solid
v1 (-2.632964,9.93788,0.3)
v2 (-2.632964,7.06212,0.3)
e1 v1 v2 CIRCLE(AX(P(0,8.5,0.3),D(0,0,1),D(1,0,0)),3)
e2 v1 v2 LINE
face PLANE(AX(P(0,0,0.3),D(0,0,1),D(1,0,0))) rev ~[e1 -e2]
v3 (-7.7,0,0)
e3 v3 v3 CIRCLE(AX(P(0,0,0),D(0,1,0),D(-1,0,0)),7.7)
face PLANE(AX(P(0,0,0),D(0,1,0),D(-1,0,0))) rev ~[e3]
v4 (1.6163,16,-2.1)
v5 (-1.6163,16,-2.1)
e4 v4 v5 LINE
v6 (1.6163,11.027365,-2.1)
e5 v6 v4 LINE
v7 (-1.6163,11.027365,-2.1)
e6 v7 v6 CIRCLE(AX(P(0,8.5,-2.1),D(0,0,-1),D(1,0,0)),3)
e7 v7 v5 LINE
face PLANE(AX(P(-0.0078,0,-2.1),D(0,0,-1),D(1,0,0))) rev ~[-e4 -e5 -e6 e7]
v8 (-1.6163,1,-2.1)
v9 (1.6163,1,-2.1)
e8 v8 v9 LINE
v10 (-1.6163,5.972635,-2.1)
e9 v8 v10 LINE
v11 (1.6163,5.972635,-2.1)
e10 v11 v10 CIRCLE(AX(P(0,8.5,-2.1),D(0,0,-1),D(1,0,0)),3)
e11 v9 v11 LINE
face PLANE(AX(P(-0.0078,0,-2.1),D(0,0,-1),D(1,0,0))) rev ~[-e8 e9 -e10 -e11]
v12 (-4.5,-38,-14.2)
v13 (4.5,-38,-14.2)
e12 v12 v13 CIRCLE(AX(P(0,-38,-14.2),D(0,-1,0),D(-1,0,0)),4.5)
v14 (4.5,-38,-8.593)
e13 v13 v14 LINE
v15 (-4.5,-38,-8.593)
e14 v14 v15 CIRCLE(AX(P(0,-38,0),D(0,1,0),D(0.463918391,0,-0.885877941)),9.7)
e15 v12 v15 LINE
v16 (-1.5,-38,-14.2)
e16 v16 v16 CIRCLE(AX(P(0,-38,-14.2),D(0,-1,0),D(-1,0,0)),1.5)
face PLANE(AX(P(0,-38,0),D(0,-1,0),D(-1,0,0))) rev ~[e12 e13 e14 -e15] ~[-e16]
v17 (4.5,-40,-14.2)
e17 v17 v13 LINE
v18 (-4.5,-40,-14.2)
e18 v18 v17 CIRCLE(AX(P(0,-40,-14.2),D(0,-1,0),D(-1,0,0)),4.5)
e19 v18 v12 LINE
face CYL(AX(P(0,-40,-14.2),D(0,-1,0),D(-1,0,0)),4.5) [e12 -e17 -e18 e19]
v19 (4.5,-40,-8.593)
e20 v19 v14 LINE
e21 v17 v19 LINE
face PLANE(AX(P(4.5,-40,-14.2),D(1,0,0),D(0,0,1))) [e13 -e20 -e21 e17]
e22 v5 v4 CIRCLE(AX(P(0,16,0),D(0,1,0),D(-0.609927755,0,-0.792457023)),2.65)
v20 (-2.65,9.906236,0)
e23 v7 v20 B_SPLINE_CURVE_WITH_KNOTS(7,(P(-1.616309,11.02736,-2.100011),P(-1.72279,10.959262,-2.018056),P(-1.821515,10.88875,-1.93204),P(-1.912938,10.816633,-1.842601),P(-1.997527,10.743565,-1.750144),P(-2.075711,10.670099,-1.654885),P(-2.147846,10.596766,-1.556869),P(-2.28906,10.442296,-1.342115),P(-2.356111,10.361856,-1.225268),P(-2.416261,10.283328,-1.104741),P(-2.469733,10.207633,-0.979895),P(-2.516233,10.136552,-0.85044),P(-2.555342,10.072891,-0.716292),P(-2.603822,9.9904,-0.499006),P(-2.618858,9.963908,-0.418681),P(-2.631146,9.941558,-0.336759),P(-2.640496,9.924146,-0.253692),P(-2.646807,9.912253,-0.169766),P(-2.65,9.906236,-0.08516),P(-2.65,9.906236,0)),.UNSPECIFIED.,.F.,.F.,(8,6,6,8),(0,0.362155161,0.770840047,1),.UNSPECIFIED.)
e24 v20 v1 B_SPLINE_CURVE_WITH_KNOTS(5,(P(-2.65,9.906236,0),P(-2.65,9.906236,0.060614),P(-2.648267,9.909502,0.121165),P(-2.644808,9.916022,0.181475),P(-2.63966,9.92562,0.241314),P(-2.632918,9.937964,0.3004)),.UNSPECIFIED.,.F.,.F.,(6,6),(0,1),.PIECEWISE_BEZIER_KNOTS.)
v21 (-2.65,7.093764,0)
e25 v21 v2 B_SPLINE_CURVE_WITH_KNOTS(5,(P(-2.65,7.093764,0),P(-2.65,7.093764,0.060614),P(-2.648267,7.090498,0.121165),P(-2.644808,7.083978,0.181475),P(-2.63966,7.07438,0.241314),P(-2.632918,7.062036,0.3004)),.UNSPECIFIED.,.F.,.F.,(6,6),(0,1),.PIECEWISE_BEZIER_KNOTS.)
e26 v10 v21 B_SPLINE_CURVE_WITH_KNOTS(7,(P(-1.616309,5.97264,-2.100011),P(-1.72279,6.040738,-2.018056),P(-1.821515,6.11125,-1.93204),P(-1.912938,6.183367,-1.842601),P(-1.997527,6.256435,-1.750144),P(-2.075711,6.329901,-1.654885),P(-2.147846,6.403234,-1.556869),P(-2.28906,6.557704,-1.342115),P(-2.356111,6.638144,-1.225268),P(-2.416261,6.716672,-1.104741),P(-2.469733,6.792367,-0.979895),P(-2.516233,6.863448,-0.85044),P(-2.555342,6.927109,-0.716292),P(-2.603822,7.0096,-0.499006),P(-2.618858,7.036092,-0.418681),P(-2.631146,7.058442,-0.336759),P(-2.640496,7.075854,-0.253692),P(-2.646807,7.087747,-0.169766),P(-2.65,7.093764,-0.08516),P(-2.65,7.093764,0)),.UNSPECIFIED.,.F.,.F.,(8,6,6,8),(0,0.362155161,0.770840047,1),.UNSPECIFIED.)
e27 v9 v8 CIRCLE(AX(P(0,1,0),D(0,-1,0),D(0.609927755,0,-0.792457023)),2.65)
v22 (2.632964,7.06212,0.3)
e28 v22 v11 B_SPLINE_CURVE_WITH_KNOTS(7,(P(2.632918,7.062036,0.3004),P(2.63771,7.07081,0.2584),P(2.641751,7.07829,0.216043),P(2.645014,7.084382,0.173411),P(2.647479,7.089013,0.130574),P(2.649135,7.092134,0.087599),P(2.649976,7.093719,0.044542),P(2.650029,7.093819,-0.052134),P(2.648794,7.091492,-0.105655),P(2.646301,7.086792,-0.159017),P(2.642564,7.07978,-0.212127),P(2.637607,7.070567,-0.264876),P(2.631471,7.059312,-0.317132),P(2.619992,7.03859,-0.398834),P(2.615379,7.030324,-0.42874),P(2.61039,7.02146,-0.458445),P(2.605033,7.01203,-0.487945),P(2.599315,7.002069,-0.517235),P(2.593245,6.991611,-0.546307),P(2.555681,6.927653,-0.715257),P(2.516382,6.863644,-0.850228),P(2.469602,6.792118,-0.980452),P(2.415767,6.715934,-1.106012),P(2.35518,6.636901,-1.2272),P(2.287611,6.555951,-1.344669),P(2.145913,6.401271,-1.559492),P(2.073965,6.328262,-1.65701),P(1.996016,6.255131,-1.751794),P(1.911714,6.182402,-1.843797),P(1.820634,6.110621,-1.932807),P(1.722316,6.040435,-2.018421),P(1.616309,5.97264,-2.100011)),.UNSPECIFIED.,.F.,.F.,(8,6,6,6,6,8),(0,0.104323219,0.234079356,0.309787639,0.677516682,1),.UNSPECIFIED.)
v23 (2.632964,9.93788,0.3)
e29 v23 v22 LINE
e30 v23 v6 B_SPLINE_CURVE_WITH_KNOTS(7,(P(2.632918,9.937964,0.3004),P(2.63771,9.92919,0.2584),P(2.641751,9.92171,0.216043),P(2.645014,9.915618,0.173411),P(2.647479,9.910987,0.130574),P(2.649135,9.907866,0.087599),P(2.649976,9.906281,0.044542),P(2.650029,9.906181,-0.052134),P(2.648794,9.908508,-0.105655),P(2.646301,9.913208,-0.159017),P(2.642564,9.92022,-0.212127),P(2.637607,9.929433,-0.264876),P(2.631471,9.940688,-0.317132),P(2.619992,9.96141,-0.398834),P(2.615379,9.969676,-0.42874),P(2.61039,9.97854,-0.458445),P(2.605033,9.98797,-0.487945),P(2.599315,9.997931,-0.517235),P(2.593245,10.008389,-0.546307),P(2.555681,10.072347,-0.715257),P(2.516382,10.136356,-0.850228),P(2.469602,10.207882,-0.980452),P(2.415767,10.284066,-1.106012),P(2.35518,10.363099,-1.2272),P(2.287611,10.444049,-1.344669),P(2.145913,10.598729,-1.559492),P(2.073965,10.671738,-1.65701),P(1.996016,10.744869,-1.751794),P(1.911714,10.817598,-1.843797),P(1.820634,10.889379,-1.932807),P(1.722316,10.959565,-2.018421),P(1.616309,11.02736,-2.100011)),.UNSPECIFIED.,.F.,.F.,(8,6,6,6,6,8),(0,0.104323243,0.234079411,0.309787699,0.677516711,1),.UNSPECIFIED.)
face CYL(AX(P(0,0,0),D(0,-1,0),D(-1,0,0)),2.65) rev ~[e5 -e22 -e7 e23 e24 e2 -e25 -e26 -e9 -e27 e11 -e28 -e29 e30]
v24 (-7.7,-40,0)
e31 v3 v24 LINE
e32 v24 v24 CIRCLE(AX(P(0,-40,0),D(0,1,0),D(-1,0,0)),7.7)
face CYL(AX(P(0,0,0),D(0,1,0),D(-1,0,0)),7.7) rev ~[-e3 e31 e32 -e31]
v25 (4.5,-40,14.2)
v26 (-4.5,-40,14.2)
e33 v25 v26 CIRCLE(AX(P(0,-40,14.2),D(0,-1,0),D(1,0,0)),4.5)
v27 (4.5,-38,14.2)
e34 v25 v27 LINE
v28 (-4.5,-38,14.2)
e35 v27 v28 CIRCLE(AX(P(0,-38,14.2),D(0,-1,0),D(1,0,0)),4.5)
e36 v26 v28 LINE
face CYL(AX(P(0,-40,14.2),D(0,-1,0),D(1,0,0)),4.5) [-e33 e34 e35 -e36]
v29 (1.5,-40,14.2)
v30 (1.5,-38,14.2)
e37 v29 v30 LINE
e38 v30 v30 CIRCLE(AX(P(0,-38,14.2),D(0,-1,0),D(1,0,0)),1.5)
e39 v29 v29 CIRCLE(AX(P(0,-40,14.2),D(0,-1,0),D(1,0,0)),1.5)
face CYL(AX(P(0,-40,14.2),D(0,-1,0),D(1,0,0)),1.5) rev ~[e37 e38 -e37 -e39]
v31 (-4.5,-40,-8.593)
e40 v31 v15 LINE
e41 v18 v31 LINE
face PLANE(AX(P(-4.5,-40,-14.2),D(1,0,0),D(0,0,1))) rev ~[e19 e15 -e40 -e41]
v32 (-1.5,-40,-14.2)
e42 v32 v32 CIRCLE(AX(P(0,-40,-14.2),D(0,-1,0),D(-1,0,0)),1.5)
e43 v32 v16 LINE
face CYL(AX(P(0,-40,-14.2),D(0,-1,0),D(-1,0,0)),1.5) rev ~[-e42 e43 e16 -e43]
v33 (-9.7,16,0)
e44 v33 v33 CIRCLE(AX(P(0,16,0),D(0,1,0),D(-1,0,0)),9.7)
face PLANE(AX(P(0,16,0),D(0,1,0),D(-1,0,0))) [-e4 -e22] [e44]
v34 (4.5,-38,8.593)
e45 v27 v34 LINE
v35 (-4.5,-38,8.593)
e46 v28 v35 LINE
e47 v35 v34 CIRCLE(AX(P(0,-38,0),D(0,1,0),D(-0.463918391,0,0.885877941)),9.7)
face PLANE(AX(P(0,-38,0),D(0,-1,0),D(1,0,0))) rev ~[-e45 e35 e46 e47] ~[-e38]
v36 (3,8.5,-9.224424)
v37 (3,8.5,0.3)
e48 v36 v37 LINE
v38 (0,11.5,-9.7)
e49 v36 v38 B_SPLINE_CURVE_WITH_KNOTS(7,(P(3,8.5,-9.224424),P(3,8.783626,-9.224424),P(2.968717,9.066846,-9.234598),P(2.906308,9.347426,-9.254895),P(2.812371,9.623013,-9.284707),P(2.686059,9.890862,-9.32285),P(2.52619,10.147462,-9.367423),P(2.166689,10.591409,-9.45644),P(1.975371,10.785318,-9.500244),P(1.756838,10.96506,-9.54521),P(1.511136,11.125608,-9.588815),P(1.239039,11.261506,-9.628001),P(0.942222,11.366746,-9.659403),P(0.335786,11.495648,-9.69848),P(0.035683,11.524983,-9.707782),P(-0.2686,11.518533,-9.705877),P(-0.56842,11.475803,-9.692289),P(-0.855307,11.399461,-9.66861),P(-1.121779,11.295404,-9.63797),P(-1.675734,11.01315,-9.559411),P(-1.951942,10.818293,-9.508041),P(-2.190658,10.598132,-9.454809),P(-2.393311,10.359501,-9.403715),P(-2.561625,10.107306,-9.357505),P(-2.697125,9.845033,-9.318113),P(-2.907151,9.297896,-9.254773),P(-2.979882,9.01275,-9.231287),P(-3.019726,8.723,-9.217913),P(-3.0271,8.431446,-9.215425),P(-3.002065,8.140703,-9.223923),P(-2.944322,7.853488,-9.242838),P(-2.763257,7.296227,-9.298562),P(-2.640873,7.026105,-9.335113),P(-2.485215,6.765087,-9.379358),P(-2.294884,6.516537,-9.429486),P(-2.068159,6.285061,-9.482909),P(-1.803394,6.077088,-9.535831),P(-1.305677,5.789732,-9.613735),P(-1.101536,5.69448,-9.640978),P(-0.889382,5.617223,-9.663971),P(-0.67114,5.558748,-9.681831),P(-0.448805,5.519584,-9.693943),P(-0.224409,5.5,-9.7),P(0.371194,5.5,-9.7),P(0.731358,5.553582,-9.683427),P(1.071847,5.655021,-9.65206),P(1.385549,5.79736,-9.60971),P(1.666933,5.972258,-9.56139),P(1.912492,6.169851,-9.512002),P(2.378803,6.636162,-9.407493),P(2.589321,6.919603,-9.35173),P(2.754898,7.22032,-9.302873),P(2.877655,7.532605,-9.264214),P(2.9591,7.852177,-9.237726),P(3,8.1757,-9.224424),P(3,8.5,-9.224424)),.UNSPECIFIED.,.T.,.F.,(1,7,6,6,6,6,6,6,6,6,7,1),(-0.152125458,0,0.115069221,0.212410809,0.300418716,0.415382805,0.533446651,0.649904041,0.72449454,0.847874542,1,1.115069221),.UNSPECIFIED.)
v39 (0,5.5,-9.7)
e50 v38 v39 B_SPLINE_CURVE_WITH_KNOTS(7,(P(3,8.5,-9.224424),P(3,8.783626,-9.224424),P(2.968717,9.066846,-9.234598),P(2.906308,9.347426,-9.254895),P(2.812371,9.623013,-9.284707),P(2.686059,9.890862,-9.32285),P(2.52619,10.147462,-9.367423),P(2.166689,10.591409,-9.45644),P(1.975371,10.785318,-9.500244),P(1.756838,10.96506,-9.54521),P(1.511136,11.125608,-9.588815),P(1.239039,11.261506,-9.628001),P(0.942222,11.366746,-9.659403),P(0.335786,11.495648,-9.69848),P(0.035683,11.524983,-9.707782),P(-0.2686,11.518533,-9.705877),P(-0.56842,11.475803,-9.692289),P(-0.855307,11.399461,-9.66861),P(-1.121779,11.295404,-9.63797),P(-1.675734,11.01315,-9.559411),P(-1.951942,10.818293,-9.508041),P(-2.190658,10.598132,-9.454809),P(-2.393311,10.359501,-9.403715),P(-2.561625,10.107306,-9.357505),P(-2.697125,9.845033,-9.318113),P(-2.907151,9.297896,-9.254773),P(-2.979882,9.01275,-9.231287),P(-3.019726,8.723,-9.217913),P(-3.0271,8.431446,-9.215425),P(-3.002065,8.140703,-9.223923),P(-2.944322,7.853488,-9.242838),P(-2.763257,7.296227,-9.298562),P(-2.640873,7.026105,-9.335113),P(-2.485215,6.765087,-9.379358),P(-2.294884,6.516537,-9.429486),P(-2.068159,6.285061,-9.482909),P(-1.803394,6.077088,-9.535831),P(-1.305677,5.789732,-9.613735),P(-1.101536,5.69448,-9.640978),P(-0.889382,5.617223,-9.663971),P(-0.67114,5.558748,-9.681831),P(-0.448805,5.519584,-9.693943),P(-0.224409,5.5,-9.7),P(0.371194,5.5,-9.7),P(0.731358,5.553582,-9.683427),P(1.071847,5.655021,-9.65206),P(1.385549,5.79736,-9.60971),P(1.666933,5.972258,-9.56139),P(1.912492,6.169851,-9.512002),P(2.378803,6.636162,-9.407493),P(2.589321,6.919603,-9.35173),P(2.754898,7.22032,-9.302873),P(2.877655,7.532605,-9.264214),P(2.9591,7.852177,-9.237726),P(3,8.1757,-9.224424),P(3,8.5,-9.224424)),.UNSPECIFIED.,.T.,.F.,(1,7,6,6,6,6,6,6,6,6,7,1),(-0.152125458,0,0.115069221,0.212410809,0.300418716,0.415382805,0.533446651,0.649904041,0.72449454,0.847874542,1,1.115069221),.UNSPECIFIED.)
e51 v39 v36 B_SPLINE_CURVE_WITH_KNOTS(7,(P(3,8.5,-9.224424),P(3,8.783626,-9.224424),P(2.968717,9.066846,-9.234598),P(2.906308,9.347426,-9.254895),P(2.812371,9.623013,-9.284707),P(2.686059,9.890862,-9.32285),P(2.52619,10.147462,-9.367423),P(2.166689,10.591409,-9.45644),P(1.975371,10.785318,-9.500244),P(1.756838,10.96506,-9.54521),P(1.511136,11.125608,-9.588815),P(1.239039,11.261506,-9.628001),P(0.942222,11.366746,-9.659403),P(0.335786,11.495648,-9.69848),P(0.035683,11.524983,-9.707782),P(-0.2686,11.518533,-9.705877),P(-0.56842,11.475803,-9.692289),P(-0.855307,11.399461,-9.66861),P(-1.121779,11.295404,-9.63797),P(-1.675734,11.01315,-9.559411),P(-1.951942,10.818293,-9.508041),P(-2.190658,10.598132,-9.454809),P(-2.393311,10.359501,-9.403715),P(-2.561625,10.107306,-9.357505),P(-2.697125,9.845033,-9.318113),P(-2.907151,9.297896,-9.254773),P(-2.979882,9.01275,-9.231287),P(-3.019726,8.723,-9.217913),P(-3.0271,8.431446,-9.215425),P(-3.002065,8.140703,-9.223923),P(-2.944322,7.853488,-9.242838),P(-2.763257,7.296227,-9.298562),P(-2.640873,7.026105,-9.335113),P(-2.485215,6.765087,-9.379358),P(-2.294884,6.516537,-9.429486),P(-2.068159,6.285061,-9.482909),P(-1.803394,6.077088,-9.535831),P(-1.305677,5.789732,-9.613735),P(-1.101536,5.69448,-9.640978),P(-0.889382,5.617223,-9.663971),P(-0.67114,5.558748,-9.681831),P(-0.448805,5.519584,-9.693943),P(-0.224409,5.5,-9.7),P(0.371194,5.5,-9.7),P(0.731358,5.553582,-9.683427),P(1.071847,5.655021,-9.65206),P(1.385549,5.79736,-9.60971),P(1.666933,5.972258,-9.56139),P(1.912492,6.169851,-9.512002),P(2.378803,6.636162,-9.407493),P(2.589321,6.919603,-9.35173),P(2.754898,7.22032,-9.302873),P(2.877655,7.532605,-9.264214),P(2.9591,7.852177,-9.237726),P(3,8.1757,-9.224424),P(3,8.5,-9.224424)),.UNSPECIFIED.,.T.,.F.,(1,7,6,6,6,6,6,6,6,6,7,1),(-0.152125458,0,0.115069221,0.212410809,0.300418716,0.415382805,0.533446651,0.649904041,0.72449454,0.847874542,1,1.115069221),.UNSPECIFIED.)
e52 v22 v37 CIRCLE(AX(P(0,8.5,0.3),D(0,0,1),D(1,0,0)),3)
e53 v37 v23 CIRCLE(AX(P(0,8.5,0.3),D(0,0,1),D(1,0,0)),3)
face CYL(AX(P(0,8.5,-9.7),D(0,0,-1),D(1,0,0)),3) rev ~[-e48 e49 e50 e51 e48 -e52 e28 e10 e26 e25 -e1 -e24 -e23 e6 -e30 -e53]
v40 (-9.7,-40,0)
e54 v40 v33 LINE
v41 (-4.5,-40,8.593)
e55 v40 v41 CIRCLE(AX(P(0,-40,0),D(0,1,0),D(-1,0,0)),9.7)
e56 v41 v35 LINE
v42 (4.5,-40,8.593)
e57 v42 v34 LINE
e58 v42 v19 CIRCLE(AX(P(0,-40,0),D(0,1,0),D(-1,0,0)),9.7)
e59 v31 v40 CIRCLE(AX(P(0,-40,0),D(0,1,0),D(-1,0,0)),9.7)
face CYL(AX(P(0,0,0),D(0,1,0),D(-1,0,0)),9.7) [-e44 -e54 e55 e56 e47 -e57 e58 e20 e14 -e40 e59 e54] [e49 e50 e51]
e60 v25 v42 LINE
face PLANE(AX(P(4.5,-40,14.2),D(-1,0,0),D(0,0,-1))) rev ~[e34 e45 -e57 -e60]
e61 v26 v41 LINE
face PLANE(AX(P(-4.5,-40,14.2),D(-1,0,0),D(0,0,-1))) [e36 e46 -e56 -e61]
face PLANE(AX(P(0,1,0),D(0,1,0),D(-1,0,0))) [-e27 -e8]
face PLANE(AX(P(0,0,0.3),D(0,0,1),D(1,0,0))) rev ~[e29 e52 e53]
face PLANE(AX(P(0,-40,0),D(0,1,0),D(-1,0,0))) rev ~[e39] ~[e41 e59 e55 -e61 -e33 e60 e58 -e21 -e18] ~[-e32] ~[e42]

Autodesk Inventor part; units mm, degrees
ref_plane "YZ Plane" through (0, 0, 0) normal (1, 0, 0) x (0, 1, 0)
ref_plane "XZ Plane" through (0, 0, 0) normal (0, 1, 0) x (-1, 0, 0)
sketch "Sketch1" plane through (0, 0, 0) normal (0, 1, 0) x (-1, 0, 0)
  line L0 (0, 0) -> (4.8, 0) construction
  circle A0 centre (0, 0) radius 2.5 construction
  circle A1 centre (0, 0) radius 2.65
  line L1 (0.0078, 2.5) -> (0.0078, -2.1) construction
  line L2 (0.0078, 2.5) -> (4.6078, 2.5) construction
  line L3 (0.0078, -2.1) -> (1.6163, -2.1)
  line L4 (0.0078, -2.1) -> (-1.6163, -2.1)
  line L5 (0.0078, -2.1) -> (1.6319, -2.1) construction
  circle A2 centre (0, 0) radius 7.5 construction
  circle A3 centre (0, 0) radius 7.7
  circle A4 centre (0, 0) radius 9.7
  dimension "d5" = 5
  dimension "d6" = 0.15
  dimension "d7" = 4.6
  dimension "d8" = 90
  dimension "d9" = 90
  dimension "d10" = 180
  dimension "d26" = 15
  dimension "d27" = 0.2
  dimension "d28" = 2
extrude "Extrusion5" add sketch "Sketch1" along normal blind 16 contours L4 L3 A1 | A3 | A4 picked at (-0.9103, -2.2002)
extrude "Extrusion6" add sketch "Sketch1" along normal blind 1 contours A1 L3 L4 picked at (0.0374, 1.0538)
extrude "Extrusion7" add sketch "Sketch1" against normal blind 40 contours A4
ref_plane "Work Plane1" through (0, 0, -9.7) normal (0, 0, 1) x (1, 0, 0)
sketch "Sketch3" plane through (0, 0, -9.7) normal (0, 0, 1) x (1, 0, 0)
  circle A0 centre (0, 8.5) radius 1.5
  circle A1 centre (0, 8.5) radius 3
  point P0 (0, 0)
  dimension "d35" = 3
  dimension "d36" = 6
extrude "Extrusion8" cut sketch "Sketch3" along normal blind 7.7 contours A0
extrude "Extrusion9" cut sketch "Sketch3" along normal blind 10
sketch "Sketch4" plane through (0, -40, 0) normal (0, -1, 0) x (1, 0, 0)
  circle A0 centre (0, 0) radius 9.7 projected
  circle A1 centre (0, 14.2) radius 1.5
  line L0 (0, 12.7) -> (0, 9.7) construction
  circle A2 centre (0, 14.2) radius 4.5
  line L1 (4.5, 14.2) -> (4.5, 8.593)
  line L2 (-4.5, 14.2) -> (-4.5, 8.593)
  circle A3 centre (0, 0) radius 9.7 projected
  dimension "d42" = 3
  dimension "d43" = 3
  dimension "d44" = 3
extrude "Extrusion10" add sketch "Sketch4" against normal blind 2 contours A0 A2 L1 | L2 A2 A0 | A2
pattern_circular "Circular Pattern1" count 2 over 360 about axis through (0, 0, 0) along (0, -1, 0) of "Extrusion10"
properties part number "Arm"
